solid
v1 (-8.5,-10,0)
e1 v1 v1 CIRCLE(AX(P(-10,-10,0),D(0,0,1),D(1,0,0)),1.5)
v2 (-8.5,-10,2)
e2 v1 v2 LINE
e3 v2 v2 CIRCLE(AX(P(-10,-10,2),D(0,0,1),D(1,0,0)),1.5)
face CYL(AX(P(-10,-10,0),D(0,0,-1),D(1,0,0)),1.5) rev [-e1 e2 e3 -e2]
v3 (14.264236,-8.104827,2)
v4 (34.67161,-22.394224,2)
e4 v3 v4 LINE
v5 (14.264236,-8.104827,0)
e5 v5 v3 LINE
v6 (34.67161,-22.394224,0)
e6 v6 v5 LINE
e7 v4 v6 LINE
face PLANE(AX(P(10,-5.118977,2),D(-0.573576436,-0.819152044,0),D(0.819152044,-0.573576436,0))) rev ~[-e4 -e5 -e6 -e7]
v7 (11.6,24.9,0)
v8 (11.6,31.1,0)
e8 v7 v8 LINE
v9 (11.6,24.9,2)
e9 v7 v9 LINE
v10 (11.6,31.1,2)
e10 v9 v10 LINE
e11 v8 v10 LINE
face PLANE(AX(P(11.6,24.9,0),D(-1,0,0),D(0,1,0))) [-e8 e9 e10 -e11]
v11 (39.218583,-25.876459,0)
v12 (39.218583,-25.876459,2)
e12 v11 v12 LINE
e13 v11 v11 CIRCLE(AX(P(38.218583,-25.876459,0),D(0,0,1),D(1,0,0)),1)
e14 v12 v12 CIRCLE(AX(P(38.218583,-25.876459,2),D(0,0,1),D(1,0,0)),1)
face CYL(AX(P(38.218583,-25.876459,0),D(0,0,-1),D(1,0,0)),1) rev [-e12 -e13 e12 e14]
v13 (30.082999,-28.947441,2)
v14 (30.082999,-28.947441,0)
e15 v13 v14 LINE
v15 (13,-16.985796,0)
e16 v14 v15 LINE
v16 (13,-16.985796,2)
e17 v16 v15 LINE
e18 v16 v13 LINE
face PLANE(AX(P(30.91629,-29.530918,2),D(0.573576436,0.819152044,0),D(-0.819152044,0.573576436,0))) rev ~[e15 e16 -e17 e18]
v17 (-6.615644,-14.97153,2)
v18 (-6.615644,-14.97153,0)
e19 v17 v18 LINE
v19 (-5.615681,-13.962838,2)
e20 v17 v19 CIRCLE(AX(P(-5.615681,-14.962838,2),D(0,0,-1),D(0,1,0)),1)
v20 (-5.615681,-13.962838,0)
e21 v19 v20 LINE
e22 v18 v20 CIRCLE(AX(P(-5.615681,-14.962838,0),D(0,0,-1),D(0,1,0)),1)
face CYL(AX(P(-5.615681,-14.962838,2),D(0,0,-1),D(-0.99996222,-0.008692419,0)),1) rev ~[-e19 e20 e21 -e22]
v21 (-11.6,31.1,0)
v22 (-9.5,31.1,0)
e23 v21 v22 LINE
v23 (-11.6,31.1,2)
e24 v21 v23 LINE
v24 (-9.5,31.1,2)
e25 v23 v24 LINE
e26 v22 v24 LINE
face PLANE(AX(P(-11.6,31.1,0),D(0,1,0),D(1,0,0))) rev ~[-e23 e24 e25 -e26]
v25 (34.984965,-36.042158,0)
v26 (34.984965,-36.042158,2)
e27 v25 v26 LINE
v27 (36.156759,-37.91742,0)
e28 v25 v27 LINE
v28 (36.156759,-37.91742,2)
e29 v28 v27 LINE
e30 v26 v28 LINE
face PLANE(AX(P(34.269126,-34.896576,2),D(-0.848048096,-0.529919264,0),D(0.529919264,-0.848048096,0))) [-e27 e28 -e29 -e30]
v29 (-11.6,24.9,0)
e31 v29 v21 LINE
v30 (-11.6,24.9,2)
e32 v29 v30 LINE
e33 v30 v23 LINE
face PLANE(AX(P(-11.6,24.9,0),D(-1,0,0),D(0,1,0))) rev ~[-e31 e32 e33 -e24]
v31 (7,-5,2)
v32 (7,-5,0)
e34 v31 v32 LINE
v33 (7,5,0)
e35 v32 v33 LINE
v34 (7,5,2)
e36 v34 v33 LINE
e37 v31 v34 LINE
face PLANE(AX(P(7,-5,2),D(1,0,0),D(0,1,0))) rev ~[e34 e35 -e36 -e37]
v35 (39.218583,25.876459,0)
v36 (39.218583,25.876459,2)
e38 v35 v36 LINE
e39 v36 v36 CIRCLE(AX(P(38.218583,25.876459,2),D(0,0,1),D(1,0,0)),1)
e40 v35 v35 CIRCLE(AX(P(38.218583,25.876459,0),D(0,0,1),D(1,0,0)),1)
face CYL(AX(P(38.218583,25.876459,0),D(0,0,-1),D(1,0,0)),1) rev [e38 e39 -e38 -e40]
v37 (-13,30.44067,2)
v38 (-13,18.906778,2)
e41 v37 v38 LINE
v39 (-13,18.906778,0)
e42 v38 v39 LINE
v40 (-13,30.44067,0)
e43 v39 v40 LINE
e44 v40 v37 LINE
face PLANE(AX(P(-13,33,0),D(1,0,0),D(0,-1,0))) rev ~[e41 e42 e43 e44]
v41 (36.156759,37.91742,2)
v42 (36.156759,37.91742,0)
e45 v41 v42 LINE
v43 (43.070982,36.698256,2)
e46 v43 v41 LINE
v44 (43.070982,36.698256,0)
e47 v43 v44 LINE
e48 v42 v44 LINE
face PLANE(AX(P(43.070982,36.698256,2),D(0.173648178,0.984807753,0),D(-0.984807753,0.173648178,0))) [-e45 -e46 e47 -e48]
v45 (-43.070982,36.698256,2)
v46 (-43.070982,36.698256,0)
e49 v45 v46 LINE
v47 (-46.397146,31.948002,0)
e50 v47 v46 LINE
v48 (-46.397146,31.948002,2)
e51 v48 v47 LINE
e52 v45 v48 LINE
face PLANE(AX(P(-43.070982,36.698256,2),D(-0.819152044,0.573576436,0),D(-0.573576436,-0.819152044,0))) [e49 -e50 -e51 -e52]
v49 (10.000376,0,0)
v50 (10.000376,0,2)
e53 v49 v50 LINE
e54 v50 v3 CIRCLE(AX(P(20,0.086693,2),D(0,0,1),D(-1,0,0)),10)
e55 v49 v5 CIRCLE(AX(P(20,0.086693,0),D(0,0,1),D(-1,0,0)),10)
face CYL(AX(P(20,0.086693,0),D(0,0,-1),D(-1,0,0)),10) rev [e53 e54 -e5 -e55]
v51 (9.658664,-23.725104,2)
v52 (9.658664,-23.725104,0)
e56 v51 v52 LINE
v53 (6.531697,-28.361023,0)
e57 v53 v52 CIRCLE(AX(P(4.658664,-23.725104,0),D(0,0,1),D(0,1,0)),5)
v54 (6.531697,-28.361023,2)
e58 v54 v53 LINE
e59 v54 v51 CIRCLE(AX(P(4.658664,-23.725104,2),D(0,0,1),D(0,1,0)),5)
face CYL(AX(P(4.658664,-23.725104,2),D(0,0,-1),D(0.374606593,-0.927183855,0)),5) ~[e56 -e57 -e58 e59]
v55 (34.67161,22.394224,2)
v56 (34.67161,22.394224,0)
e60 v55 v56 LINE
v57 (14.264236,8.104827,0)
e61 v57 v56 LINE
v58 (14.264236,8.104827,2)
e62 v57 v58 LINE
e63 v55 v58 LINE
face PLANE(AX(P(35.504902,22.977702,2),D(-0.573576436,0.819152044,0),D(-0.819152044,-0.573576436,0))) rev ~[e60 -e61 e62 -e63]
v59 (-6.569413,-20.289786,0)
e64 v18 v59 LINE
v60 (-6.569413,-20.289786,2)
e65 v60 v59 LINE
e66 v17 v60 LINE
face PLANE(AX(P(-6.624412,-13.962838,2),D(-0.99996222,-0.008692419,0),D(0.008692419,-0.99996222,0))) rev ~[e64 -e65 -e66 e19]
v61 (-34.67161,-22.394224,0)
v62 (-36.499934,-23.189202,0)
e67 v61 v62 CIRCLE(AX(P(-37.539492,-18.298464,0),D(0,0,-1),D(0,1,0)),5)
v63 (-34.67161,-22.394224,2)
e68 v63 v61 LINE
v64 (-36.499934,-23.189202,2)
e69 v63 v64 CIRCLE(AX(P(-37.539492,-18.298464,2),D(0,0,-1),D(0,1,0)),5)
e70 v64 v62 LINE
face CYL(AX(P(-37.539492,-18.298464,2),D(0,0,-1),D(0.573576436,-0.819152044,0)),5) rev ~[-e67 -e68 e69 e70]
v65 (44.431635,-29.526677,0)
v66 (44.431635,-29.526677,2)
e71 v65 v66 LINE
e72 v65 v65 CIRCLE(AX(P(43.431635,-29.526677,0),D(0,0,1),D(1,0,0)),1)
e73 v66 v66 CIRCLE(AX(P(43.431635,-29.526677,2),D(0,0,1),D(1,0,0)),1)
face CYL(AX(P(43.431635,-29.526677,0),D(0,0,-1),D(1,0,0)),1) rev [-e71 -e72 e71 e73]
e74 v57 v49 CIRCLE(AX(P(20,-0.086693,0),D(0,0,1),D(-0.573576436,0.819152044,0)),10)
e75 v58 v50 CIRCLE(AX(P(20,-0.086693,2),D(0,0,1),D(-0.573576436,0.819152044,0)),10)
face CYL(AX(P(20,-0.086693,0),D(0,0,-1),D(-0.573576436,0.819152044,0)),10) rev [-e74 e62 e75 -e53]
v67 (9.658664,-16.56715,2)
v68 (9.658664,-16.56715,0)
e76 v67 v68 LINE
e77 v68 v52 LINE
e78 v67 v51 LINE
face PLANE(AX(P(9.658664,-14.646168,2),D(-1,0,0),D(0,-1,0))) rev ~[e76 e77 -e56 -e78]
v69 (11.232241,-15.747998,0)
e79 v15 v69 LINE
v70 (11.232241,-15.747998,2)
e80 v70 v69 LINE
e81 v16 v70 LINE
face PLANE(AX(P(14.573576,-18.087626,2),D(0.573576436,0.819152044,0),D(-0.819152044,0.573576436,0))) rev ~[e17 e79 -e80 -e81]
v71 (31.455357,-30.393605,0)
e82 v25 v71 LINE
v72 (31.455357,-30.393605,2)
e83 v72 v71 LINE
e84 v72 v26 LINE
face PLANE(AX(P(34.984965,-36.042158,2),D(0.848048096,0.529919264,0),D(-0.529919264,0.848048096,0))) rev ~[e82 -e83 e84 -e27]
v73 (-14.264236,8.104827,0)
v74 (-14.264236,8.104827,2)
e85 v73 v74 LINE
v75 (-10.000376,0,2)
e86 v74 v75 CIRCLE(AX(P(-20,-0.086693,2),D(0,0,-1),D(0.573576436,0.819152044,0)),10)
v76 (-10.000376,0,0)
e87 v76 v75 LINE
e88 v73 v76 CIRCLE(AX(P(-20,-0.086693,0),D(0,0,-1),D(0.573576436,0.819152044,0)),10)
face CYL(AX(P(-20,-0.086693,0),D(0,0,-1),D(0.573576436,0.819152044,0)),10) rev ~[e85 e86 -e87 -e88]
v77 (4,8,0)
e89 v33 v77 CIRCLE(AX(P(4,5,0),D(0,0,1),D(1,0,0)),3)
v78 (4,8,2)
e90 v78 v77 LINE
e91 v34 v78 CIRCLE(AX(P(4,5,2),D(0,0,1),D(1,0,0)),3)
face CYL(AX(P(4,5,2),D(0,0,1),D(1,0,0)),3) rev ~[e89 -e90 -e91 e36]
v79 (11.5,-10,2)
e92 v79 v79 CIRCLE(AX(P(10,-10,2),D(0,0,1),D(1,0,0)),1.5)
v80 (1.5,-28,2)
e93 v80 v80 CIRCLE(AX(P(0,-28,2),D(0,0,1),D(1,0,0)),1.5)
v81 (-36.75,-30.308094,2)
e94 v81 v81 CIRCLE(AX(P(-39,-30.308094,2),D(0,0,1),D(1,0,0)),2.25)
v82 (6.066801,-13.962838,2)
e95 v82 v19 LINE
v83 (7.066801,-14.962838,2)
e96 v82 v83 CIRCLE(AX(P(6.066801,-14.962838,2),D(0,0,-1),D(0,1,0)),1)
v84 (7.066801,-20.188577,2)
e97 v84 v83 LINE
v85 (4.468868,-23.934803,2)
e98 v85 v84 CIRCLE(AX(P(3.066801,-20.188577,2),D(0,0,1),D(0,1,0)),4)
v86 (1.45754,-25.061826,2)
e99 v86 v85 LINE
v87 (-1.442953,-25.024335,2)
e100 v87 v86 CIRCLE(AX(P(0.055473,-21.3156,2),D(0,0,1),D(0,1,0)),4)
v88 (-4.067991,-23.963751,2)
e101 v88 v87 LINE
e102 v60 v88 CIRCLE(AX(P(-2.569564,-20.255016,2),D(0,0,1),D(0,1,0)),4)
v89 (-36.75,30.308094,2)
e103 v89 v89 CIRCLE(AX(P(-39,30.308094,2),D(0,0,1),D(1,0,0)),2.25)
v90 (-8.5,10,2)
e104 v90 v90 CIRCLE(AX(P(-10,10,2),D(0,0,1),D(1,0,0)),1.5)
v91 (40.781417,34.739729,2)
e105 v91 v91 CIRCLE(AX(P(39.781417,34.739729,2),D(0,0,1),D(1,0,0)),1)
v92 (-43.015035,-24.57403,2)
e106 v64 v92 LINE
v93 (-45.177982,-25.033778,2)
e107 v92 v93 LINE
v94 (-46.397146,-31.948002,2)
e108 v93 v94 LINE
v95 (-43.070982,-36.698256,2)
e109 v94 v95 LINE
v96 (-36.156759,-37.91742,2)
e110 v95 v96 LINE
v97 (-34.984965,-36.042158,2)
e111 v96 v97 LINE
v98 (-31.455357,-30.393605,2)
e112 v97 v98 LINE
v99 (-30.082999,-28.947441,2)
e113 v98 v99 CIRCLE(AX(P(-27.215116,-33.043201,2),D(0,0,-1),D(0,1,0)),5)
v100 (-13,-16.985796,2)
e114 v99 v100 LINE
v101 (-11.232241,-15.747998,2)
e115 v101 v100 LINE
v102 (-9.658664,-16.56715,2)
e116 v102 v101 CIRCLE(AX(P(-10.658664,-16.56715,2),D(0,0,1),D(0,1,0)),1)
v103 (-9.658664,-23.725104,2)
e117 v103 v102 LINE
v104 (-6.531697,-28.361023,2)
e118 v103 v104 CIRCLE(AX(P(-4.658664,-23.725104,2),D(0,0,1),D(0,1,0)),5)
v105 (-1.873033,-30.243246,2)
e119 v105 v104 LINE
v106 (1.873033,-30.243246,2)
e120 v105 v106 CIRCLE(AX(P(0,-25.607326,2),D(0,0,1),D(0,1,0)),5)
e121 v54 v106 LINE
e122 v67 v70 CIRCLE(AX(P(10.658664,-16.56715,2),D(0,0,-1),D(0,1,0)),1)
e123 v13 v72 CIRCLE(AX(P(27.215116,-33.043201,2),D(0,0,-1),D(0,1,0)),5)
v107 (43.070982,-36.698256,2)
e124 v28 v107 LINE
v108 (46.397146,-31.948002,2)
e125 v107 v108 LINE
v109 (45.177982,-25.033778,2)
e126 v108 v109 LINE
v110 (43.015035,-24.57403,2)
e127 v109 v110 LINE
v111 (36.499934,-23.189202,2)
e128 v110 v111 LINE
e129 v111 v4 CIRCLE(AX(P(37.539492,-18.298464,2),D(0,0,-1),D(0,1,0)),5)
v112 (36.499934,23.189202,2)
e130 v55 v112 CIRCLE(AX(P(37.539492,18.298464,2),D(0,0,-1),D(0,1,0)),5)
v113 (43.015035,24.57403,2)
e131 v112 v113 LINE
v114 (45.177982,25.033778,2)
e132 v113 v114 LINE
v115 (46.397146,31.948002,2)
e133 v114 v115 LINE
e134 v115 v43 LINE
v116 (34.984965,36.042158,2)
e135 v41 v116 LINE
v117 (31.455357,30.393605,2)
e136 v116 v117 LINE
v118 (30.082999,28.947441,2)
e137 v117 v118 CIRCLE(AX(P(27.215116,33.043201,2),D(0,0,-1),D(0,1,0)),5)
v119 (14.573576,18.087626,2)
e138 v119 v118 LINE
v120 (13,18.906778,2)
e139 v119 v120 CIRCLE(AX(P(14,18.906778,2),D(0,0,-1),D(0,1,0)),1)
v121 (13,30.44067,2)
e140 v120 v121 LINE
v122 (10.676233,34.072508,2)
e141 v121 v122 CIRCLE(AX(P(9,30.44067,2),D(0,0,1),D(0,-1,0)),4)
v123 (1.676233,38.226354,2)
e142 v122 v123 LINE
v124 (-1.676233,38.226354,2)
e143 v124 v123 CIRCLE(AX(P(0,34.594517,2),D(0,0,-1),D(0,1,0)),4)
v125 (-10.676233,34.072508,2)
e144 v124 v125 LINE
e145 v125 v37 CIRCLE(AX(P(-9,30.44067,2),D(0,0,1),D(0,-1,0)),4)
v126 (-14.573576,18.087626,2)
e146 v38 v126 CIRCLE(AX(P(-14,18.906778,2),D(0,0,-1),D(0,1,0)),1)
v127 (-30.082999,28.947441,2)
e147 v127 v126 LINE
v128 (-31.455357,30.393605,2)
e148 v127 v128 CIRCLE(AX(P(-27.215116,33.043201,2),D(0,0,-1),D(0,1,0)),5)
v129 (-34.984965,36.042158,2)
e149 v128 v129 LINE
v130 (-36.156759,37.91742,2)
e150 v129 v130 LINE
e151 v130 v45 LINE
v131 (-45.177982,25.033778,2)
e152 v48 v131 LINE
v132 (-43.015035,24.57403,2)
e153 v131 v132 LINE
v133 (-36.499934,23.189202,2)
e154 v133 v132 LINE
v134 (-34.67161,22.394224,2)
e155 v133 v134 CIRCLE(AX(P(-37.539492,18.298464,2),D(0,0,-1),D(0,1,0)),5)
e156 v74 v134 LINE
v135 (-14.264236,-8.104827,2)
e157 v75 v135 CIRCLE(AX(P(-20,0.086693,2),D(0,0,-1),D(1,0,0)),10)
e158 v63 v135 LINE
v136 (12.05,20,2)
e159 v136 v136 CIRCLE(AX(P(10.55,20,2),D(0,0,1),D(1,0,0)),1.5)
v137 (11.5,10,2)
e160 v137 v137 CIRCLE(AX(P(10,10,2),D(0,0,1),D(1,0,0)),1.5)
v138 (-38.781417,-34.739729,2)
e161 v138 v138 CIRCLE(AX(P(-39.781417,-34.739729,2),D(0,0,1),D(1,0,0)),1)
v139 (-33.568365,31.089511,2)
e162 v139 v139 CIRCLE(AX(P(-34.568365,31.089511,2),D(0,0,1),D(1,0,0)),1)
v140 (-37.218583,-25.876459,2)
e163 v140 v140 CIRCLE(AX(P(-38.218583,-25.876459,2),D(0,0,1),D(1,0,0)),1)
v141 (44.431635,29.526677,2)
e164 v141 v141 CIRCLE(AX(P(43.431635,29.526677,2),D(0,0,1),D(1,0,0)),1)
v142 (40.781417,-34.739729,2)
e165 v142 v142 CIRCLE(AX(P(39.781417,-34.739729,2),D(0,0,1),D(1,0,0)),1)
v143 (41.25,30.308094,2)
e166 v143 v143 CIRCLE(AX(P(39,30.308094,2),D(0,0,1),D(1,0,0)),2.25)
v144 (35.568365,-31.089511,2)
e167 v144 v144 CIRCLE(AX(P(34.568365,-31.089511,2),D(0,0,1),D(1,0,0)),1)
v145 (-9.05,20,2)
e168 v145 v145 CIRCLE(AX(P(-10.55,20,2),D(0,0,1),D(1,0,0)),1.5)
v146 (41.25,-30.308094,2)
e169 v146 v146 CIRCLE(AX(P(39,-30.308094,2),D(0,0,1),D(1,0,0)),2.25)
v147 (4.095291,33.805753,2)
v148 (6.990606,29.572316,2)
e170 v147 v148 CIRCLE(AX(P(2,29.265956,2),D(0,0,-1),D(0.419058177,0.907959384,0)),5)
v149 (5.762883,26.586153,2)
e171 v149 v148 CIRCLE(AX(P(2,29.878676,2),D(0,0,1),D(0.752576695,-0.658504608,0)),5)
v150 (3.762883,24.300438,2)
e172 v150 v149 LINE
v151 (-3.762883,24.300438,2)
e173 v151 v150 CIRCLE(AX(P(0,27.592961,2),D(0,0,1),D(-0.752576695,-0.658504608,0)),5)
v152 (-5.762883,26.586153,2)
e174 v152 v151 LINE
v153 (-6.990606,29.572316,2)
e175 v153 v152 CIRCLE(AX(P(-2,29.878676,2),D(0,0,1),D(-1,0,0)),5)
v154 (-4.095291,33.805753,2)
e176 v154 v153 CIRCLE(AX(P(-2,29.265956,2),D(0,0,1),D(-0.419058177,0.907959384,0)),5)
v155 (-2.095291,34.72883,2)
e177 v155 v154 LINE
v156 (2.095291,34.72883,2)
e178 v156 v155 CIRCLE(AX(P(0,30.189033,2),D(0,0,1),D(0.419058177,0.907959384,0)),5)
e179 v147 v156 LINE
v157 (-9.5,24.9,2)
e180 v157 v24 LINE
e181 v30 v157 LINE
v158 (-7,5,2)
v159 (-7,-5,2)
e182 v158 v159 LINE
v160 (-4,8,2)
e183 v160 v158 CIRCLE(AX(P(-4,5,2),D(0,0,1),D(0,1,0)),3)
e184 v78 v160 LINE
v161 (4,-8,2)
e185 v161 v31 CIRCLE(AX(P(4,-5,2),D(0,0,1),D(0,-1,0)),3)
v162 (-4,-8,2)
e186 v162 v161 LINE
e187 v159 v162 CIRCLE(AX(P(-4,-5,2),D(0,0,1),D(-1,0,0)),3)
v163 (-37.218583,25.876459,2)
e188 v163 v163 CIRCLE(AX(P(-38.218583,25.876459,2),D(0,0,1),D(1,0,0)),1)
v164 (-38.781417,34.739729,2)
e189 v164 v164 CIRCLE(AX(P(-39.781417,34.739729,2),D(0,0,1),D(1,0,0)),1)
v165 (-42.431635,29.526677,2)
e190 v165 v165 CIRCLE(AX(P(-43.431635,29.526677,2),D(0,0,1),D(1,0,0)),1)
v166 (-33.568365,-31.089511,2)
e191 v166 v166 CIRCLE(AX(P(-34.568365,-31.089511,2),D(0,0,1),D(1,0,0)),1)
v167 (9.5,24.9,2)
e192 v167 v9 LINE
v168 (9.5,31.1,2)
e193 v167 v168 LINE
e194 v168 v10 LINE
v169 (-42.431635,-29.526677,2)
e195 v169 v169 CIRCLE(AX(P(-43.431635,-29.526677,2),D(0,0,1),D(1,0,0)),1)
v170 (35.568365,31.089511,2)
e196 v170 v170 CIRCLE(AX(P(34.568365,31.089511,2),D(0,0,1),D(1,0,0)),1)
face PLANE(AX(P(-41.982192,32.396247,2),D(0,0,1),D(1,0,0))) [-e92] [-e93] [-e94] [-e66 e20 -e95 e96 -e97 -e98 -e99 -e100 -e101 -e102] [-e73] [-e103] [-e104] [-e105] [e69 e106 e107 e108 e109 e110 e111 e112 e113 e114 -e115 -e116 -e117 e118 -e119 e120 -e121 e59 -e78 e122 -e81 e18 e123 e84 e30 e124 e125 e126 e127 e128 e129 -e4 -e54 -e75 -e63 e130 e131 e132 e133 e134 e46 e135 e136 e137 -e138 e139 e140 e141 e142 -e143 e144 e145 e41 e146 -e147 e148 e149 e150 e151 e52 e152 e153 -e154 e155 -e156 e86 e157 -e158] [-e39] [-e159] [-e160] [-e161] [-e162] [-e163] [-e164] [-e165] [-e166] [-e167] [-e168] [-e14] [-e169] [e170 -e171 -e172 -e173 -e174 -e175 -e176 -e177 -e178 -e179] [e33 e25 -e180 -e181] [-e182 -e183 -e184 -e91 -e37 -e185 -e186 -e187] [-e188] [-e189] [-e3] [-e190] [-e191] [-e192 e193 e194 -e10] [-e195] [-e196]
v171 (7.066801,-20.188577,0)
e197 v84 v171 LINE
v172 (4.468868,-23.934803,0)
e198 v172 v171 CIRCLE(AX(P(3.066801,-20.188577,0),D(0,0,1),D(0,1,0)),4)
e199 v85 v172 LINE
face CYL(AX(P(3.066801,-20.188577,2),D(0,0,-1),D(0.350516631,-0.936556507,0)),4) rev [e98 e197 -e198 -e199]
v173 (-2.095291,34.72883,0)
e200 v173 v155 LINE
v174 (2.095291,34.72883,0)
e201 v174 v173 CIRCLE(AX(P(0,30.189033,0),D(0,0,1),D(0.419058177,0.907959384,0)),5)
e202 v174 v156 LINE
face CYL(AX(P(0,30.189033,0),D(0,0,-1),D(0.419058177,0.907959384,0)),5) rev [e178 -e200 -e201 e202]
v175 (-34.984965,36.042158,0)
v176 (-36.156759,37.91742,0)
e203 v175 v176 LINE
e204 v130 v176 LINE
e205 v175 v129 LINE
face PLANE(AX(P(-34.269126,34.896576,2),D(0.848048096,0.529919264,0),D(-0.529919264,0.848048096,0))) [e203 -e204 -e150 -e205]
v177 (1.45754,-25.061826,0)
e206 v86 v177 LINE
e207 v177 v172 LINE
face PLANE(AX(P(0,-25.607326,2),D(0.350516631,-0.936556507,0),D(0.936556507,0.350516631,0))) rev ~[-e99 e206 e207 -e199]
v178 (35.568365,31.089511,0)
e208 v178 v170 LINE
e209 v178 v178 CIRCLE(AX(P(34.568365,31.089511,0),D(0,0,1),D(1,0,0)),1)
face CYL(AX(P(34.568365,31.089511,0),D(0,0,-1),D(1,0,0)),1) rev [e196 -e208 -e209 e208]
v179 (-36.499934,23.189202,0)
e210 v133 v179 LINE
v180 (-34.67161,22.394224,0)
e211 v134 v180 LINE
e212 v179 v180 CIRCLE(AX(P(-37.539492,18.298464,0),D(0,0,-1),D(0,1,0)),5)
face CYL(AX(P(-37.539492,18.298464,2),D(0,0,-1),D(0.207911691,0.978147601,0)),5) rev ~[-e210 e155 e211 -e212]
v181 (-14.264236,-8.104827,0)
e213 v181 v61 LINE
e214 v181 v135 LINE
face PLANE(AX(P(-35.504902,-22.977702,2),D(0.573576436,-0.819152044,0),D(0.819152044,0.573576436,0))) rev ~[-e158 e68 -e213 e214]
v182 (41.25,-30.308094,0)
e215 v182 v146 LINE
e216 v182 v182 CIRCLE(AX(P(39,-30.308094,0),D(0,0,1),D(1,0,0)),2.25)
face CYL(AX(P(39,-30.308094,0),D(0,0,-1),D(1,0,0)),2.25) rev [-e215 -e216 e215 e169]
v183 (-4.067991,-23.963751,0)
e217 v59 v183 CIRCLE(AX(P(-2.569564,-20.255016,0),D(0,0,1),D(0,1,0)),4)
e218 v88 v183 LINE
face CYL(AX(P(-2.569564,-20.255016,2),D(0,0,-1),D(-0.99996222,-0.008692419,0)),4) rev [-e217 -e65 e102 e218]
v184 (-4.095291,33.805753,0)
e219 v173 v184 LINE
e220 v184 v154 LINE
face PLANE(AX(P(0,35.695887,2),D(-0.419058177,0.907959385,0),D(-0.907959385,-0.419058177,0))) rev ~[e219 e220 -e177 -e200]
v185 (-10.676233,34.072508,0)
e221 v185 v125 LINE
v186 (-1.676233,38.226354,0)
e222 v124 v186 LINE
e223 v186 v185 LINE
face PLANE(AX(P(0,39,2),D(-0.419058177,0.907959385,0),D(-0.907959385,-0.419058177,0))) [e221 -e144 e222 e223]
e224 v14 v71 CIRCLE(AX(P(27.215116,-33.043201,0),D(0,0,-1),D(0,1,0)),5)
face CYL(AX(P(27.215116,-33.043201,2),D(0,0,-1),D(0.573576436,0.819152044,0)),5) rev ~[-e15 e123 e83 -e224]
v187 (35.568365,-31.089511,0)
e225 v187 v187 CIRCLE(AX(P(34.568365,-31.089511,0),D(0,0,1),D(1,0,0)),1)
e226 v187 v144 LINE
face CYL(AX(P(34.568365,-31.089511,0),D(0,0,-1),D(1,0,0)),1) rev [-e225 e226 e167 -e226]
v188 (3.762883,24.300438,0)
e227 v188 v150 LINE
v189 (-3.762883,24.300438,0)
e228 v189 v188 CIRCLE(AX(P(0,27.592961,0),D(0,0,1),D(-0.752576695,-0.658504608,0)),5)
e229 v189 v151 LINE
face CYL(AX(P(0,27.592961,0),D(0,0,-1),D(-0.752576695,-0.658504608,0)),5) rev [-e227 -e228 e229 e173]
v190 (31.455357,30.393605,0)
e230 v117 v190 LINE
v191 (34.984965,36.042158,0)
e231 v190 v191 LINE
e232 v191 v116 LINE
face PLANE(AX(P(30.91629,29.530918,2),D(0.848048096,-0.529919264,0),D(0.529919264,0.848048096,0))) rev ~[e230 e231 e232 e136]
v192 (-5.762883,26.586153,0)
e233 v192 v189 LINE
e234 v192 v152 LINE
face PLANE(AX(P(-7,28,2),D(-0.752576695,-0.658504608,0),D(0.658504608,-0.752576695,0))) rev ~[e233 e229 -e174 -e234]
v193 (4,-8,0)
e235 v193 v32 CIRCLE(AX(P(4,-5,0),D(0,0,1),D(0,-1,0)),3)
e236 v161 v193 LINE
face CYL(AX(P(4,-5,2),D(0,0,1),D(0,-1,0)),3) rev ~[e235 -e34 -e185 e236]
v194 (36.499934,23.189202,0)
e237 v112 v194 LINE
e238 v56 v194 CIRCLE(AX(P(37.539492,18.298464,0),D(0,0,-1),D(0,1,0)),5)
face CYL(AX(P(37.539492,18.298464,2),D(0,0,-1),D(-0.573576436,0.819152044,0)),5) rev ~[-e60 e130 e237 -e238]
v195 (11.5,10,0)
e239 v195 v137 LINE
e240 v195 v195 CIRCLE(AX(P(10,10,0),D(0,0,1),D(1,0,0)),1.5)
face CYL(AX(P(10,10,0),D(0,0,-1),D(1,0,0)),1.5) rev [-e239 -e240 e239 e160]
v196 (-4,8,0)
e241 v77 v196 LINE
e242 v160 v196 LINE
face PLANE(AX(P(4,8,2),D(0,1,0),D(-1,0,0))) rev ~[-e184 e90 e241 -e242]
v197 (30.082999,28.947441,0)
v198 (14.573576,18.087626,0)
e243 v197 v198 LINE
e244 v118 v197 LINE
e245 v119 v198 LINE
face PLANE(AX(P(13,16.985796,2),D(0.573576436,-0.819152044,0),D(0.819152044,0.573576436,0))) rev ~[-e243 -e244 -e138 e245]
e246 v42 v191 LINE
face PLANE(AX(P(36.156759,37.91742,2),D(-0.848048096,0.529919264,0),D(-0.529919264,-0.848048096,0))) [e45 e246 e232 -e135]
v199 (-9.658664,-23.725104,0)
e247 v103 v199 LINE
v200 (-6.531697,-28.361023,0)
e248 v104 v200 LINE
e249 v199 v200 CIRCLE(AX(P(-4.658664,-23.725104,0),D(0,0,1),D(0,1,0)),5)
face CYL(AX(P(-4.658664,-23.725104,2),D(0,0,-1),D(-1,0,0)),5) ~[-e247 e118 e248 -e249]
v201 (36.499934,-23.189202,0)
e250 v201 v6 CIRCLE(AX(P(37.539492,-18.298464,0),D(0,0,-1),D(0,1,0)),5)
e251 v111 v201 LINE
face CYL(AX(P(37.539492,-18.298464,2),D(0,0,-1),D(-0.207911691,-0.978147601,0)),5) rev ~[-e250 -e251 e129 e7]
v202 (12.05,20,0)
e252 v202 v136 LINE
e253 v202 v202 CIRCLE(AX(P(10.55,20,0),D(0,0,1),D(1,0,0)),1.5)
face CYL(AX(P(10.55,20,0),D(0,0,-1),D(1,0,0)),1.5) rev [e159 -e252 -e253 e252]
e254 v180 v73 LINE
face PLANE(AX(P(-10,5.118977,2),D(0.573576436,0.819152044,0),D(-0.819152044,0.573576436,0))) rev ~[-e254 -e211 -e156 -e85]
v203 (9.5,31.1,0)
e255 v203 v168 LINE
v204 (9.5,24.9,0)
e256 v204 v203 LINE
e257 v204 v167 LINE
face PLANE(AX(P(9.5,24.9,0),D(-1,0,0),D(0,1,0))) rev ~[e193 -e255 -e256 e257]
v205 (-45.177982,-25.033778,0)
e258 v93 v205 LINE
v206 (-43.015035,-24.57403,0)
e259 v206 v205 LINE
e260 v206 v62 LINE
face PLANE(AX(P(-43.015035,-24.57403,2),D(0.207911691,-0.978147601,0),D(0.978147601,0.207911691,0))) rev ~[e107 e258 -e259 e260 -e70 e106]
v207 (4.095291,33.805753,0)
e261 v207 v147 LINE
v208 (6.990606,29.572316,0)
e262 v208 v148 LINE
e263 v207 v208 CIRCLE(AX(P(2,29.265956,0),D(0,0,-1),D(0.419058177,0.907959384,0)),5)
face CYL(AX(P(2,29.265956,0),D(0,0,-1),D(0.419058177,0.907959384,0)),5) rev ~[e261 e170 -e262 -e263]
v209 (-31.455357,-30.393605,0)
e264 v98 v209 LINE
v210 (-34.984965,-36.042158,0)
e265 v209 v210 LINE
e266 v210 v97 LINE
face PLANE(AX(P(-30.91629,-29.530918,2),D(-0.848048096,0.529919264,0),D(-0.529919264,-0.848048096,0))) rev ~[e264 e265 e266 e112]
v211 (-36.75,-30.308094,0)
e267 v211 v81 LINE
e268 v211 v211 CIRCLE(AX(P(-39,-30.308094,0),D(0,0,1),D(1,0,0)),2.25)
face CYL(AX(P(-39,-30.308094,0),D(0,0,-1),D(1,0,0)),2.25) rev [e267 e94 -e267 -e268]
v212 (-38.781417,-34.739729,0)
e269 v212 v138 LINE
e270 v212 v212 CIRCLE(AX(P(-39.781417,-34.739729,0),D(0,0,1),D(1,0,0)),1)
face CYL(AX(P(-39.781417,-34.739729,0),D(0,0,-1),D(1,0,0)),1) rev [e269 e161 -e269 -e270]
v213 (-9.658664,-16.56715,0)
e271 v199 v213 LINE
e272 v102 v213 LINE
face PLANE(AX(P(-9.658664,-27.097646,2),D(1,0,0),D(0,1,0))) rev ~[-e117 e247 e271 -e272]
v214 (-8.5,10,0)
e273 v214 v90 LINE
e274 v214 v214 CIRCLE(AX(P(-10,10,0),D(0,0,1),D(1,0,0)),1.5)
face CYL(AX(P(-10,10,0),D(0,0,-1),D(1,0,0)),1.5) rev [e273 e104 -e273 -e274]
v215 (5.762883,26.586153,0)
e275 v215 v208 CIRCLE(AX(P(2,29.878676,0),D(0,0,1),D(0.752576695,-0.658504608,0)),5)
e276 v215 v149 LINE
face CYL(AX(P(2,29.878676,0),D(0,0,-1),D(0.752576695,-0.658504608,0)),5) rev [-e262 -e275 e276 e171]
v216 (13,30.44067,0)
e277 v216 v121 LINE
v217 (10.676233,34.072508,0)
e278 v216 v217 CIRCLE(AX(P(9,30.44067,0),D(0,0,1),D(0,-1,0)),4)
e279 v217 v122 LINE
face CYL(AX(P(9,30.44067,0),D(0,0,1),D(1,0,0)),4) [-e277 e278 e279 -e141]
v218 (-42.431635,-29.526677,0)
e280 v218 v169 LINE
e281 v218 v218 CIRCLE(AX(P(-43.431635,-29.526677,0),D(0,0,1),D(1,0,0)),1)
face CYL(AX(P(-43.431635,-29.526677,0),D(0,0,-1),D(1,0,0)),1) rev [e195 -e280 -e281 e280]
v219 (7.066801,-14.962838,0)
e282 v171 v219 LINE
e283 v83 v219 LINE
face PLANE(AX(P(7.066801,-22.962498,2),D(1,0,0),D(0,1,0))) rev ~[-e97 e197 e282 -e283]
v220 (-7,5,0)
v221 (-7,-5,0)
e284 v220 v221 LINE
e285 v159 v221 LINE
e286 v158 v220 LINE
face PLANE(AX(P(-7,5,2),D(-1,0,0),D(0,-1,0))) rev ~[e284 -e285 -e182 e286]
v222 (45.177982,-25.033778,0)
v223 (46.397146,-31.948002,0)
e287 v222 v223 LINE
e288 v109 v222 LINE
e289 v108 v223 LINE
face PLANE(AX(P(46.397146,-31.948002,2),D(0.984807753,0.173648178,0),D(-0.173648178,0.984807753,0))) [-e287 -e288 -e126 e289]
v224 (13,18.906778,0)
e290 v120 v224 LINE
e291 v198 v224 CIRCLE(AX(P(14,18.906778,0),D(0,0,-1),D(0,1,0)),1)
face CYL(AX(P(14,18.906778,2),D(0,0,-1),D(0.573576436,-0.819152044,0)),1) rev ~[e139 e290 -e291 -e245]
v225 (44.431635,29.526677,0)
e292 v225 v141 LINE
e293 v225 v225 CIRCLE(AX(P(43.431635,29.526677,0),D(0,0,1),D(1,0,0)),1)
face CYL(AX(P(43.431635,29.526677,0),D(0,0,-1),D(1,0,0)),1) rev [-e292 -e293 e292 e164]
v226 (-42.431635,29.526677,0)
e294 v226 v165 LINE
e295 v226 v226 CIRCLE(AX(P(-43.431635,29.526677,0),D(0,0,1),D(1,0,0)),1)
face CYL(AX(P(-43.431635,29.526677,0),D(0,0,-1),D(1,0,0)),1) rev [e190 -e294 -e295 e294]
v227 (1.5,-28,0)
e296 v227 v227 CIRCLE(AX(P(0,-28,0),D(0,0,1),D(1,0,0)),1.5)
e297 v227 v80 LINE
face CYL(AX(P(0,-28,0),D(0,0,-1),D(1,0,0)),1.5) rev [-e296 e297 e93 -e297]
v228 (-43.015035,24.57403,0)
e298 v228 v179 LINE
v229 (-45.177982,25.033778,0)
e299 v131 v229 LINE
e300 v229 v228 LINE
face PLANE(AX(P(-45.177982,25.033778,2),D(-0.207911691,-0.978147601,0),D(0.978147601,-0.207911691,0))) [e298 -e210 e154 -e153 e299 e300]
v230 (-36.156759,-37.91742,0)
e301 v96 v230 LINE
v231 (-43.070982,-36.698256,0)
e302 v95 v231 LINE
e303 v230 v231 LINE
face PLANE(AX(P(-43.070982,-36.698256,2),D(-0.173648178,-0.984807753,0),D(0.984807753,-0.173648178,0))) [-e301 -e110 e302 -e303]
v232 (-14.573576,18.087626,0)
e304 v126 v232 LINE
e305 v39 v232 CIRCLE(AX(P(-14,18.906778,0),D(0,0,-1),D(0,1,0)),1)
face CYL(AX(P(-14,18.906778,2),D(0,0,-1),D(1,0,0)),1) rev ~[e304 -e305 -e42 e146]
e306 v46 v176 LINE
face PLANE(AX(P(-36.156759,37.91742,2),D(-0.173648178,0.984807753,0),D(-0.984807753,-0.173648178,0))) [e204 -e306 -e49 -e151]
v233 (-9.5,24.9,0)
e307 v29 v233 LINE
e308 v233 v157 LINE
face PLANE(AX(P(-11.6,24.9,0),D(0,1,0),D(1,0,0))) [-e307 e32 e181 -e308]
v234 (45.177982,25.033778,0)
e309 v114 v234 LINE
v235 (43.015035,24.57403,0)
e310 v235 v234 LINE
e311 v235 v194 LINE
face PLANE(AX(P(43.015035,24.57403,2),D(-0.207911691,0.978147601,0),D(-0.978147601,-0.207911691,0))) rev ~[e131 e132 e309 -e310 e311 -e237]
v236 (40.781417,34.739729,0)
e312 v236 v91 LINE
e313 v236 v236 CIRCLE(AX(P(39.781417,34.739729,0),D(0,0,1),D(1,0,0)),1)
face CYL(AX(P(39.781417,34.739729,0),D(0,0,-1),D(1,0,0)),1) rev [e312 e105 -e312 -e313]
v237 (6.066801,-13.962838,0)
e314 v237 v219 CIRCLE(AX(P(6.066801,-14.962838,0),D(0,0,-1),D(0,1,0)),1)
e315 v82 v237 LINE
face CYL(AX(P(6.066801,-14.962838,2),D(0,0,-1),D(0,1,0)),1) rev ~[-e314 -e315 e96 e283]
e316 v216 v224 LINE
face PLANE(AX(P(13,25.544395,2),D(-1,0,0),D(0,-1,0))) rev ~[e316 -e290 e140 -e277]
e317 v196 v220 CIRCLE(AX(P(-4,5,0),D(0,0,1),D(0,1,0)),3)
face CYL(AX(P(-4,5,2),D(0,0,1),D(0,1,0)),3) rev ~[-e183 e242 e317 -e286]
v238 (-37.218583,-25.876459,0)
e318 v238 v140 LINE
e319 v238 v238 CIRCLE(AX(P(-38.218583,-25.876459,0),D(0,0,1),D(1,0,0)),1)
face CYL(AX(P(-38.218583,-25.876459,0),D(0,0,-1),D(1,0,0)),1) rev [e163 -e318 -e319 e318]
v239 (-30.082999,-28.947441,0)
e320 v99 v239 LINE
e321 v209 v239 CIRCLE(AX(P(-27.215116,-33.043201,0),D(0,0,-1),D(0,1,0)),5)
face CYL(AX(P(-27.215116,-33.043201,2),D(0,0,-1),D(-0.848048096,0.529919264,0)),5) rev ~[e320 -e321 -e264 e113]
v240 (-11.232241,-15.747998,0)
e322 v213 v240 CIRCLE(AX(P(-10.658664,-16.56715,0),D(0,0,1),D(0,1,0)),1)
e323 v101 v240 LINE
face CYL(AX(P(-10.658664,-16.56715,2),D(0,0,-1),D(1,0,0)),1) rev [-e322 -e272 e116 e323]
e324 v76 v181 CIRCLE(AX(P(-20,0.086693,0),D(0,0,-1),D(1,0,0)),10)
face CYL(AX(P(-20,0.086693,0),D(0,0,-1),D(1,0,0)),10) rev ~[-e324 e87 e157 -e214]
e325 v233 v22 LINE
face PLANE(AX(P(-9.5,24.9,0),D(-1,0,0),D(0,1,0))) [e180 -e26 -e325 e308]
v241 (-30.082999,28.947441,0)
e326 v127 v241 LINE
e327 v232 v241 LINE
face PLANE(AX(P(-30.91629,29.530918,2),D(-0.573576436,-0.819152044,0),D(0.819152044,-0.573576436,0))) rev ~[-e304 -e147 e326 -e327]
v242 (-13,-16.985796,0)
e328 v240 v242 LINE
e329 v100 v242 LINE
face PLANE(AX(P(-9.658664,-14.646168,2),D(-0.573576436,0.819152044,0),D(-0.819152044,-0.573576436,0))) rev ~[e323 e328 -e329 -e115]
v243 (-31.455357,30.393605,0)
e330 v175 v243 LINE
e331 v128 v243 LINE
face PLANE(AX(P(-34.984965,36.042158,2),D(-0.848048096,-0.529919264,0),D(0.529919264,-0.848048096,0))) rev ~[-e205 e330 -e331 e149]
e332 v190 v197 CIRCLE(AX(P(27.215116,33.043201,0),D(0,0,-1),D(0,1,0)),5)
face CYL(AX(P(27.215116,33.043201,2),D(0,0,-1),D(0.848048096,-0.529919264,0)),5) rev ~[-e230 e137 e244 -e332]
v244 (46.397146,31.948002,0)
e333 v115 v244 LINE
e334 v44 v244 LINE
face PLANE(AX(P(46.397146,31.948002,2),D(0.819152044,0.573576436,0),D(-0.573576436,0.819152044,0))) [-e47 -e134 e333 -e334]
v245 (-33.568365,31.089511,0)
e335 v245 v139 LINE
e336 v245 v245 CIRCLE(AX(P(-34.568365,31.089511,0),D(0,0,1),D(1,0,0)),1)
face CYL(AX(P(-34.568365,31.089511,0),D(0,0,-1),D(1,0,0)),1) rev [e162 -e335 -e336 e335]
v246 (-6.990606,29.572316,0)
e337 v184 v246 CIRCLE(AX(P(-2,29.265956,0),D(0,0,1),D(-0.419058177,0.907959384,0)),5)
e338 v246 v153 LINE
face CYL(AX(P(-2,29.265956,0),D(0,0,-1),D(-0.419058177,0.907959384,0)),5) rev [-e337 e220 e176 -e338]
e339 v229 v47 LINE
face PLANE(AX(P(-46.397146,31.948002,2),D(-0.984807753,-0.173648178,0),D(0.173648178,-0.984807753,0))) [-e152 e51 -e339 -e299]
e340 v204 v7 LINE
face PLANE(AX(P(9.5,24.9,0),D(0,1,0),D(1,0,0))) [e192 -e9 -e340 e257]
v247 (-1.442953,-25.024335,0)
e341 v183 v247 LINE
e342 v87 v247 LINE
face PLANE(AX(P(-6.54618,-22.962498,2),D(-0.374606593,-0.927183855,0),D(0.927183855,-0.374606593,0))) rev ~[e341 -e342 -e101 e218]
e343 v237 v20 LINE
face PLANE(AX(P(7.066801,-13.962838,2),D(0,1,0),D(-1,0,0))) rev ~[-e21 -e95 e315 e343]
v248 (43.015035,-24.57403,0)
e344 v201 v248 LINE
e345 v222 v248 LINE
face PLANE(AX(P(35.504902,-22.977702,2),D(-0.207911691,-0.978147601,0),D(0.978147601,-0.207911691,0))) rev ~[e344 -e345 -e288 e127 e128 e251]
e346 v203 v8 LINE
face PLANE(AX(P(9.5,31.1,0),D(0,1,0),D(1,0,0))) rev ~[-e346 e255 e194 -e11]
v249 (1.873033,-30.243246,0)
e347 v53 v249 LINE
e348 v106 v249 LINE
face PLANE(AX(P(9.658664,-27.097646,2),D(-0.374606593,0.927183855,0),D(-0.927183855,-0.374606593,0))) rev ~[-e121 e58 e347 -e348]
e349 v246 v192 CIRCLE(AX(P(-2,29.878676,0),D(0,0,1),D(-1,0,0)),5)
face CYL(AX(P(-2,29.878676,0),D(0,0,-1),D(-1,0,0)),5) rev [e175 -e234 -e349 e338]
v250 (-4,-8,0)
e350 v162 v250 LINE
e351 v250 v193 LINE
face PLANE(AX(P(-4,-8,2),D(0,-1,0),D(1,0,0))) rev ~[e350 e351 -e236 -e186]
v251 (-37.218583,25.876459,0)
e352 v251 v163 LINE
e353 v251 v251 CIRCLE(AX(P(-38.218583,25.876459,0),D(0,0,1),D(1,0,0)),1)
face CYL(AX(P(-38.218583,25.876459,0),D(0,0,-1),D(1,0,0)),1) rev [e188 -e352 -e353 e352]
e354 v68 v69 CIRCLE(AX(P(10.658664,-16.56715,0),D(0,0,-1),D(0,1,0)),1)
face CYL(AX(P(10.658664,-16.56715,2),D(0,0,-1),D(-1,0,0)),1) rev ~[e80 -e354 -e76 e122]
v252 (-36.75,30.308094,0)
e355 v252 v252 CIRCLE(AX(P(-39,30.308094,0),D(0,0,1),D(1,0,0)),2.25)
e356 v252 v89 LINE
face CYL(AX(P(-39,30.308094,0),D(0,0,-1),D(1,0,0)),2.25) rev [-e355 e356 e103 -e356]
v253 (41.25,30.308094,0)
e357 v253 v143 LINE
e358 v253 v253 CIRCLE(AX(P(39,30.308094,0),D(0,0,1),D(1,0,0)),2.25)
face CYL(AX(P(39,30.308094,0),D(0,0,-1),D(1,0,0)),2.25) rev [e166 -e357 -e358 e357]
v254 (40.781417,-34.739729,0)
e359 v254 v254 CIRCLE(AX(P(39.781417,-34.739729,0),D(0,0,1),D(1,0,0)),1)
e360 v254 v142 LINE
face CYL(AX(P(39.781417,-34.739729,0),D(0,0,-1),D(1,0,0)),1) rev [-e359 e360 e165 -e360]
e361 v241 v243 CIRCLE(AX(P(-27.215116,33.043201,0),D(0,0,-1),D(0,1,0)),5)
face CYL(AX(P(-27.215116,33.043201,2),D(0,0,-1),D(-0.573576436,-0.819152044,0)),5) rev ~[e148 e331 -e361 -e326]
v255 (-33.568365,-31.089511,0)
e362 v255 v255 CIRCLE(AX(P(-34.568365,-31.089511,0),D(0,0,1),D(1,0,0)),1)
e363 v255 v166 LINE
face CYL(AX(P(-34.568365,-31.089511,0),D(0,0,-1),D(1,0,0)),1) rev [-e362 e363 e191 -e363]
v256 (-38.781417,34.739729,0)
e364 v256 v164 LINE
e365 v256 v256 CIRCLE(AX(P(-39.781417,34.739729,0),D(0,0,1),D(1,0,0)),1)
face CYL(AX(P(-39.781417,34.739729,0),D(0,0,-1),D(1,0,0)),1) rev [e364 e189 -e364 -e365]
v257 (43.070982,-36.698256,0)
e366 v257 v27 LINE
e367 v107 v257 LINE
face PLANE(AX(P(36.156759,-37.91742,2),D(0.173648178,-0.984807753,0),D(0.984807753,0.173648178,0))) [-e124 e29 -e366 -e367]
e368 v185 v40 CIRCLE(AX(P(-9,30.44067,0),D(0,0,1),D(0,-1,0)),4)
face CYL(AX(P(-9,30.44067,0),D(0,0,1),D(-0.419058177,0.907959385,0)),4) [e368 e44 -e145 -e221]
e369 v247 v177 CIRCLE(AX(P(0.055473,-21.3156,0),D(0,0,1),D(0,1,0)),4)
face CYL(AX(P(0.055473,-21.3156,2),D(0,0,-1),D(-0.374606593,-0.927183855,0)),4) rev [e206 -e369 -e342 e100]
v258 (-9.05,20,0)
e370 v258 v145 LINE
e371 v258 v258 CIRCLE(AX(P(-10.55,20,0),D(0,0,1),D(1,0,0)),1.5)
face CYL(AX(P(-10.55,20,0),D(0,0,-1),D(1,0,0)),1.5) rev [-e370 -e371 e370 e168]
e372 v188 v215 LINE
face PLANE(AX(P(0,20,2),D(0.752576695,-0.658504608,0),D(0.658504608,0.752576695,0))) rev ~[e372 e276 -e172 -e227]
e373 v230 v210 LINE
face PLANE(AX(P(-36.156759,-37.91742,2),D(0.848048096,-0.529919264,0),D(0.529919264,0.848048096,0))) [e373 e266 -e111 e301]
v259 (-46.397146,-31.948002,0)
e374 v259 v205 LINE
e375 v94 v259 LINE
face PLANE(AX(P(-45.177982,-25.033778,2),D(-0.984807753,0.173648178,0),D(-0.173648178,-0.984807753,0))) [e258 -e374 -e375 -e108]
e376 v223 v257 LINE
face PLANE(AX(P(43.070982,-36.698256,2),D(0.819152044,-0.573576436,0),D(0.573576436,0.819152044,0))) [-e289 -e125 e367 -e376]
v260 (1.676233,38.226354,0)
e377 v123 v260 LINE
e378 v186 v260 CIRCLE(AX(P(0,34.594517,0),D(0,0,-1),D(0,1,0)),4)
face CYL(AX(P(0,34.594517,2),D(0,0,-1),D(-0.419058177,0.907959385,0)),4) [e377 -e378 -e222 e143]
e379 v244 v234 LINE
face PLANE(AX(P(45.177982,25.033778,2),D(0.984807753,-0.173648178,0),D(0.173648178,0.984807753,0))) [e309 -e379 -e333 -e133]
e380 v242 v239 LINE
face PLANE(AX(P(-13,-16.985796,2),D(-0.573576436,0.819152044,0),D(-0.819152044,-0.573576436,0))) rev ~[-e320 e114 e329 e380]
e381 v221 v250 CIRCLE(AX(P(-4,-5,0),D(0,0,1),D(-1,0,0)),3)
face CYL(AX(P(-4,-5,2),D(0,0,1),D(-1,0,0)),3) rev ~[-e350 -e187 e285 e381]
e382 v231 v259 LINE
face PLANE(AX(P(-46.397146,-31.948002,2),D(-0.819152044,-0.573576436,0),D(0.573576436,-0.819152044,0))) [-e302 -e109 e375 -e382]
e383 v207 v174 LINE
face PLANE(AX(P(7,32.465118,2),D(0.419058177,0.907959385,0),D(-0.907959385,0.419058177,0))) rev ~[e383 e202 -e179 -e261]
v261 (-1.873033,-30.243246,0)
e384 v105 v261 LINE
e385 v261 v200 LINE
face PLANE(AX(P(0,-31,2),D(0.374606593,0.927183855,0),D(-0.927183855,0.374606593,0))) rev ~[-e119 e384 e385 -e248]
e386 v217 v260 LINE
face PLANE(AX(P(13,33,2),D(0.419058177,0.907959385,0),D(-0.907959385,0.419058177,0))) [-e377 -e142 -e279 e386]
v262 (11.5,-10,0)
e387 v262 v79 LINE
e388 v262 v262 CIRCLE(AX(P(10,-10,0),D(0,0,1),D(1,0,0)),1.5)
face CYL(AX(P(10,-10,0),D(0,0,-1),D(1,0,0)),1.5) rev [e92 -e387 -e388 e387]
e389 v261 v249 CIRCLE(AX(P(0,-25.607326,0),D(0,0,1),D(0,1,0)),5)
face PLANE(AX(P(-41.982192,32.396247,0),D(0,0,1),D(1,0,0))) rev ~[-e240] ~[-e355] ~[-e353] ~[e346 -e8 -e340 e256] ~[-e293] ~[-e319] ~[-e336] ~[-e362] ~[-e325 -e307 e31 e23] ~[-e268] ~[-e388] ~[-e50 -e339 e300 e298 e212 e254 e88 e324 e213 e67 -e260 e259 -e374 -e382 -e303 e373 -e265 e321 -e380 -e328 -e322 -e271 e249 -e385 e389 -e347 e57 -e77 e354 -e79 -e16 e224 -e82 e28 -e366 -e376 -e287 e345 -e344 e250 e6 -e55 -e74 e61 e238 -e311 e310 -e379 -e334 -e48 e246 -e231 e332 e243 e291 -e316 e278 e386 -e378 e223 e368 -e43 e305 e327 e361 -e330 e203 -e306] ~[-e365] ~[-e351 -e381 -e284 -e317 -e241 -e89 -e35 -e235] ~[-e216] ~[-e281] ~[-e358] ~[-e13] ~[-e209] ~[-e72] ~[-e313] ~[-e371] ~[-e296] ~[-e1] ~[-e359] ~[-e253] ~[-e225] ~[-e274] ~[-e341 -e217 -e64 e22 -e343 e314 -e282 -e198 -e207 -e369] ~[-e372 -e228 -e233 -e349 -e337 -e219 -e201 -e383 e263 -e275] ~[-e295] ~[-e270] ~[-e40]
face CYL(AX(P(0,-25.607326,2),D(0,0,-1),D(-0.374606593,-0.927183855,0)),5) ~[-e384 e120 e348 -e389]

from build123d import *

# Parameters (mm, degrees)
F0_R         = 1.5
F0_R_2       = 1
F0_R_3       = 2.25
F0_W         = 2.1
F0_H         = 6.2
F1_DEPTH     = 2
F3_DEPTH     = 2
F4_R         = 4
F6_DEPTH     = 2.001
F7_T1_DEPTH  = 2
F9_DEPTH     = 2.001
F10_R        = 5
F11_R        = 1
F12_T1_DEPTH = 2
F14_DEPTH    = 2
F16_DEPTH    = 2.001
F18_DEPTH    = 2.001
F19_R        = 5
F21_DEPTH    = 2.001
F22_R        = 4
F23_R        = 1
F24_R        = 1


# Not quite as in the source:
# - a fillet or chamfer that OpenCascade refuses, or shapes differently, is made with other operations: its cross-section is extruded or revolved along the edge and cut away or added


with BuildPart() as f1:
    # F0 (on Top) → F1 (new body)
    with BuildSketch(Plane.XY):
        Polygon((13, 3.5572758754), (13, 13), (-13, 13), (-13, 3.5572758754), (-13, -3.5572758754), (-13, -13), (13, -13), (13, -3.5572758754), align=None)
        with Locations((-10, -10)):
            Circle(F0_R, mode=Mode.SUBTRACT)
        with Locations((10, -10)):
            Circle(F0_R, mode=Mode.SUBTRACT)
        with Locations((-10, 10)):
            Circle(F0_R, mode=Mode.SUBTRACT)
        with Locations((10, 10)):
            Circle(F0_R, mode=Mode.SUBTRACT)
        with BuildLine():
            Line((13, 20.6481201181), (13, 13))
            Line((13, 13), (13, 3.5572758754))
            Line((13, 3.5572758754), (43.0150350545, 24.5740296802))
            ThreePointArc((43.0150350545, 24.5740296802), (44.73406431, 34.3231290446), (34.9849649455, 36.0421583002))
            Line((34.9849649455, 36.0421583002), (13, 20.6481201181))
        make_face()
        with Locations((38.2185832005, 25.8764591016)):
            Circle(F0_R_2, mode=Mode.SUBTRACT)
        with Locations((39, 30.3080939902)):
            Circle(F0_R_3, mode=Mode.SUBTRACT)
        with Locations((34.5683651114, 31.0895107897)):
            Circle(F0_R_2, mode=Mode.SUBTRACT)
        with Locations((43.4316348886, 29.5266771907)):
            Circle(F0_R_2, mode=Mode.SUBTRACT)
        with Locations((39.7814167995, 34.7397288787)):
            Circle(F0_R_2, mode=Mode.SUBTRACT)
        Polygon((-13, 13), (13, 13), (13, 20.6481201181), (13, 33), (-13, 33), (-13, 20.6481201181), align=None)
        with Locations((-10.55, 20)):
            Circle(F0_R, mode=Mode.SUBTRACT)
        with Locations((-10.55, 28)):
            Rectangle(F0_W, F0_H, mode=Mode.SUBTRACT)
        with Locations((10.55, 20)):
            Circle(F0_R, mode=Mode.SUBTRACT)
        with Locations((10.55, 28)):
            Rectangle(F0_W, F0_H, mode=Mode.SUBTRACT)
        with BuildLine():
            Line((-13, 3.5572758754), (-13, 13))
            Line((-13, 13), (-13, 20.6481201181))
            Line((-13, 20.6481201181), (-34.9849649455, 36.0421583002))
            ThreePointArc((-34.9849649455, 36.0421583002), (-44.73406431, 34.3231290446), (-43.0150350545, 24.5740296802))
            Line((-43.0150350545, 24.5740296802), (-13, 3.5572758754))
        make_face()
        with Locations((-38.2185832005, 25.8764591016)):
            Circle(F0_R_2, mode=Mode.SUBTRACT)
        with Locations((-43.4316348886, 29.5266771907)):
            Circle(F0_R_2, mode=Mode.SUBTRACT)
        with Locations((-39, 30.3080939902)):
            Circle(F0_R_3, mode=Mode.SUBTRACT)
        with Locations((-34.5683651114, 31.0895107897)):
            Circle(F0_R_2, mode=Mode.SUBTRACT)
        with Locations((-39.7814167995, 34.7397288787)):
            Circle(F0_R_2, mode=Mode.SUBTRACT)
        with BuildLine():
            Line((43.0150350545, -24.5740296802), (13, -3.5572758754))
            Line((13, -3.5572758754), (13, -13))
            Line((13, -13), (13, -20.6481201181))
            Line((13, -20.6481201181), (34.9849649455, -36.0421583002))
            ThreePointArc((34.9849649455, -36.0421583002), (44.73406431, -34.3231290446), (43.0150350545, -24.5740296802))
        make_face()
        with Locations((39.7814167995, -34.7397288787)):
            Circle(F0_R_2, mode=Mode.SUBTRACT)
        with Locations((34.5683651114, -31.0895107897)):
            Circle(F0_R_2, mode=Mode.SUBTRACT)
        with Locations((39, -30.3080939902)):
            Circle(F0_R_3, mode=Mode.SUBTRACT)
        with Locations((43.4316348886, -29.5266771907)):
            Circle(F0_R_2, mode=Mode.SUBTRACT)
        with Locations((38.2185832005, -25.8764591016)):
            Circle(F0_R_2, mode=Mode.SUBTRACT)
        with BuildLine():
            Line((-13, -13), (-13, -3.5572758754))
            Line((-13, -3.5572758754), (-43.0150350545, -24.5740296802))
            ThreePointArc((-43.0150350545, -24.5740296802), (-44.73406431, -34.3231290446), (-34.9849649455, -36.0421583002))
            Line((-34.9849649455, -36.0421583002), (-13, -20.6481201181))
            Line((-13, -20.6481201181), (-13, -13))
        make_face()
        with Locations((-39.7814167995, -34.7397288787)):
            Circle(F0_R_2, mode=Mode.SUBTRACT)
        with Locations((-43.4316348886, -29.5266771907)):
            Circle(F0_R_2, mode=Mode.SUBTRACT)
        with Locations((-34.5683651114, -31.0895107897)):
            Circle(F0_R_2, mode=Mode.SUBTRACT)
        with Locations((-39, -30.3080939902)):
            Circle(F0_R_3, mode=Mode.SUBTRACT)
        with Locations((-38.2185832005, -25.8764591016)):
            Circle(F0_R_2, mode=Mode.SUBTRACT)
        Polygon((13, -20.6481201181), (13, -13), (-13, -13), (-13, -20.6481201181), (-13, -31), (13, -31), align=None)
        with Locations((0, -28)):
            Circle(F0_R, mode=Mode.SUBTRACT)
    extrude(amount=F1_DEPTH)

    # F2 (on face) → F3 (join, through all)
    with BuildSketch(Plane.XY.offset(2)):
        Polygon((0, 39), (-13, 33), (-13, 32), (13, 32), (13, 33), align=None)
    extrude(amount=-F3_DEPTH)

    # F4
    f4_edges = [f1.edges().sort_by_distance(p)[0] for p in [
        (-13, 33, 1),
        (0, 39, 1),
        (13, 33, 1),
    ]]
    fillet(f4_edges, radius=F4_R)

    # F5 (on face) → F6 (cut, through all)
    with BuildSketch(Plane.XY.offset(2)):
        Polygon((7, 32.4651182162), (0, 35.6958874469), (-7, 32.4651182162), (-7, 28), (0, 20), (7, 28), align=None)
    extrude(amount=-F6_DEPTH, mode=Mode.SUBTRACT)

    # F7: fillet of radius 5 on 6 edges, made by hand

    # F7_s2 → F7_t1 (join)
    with BuildSketch(Plane.XY):
        with BuildLine():
            ThreePointArc((2.0952908873, 34.7288301143), (0, 35.1890331918), (-2.0952908873, 34.7288301143))
            Line((-2.0952908873, 34.7288301143), (0, 35.6958874469))
            Line((0, 35.6958874469), (2.0952908873, 34.7288301143))
        make_face()
        with BuildLine():
            ThreePointArc((-4.0952908873, 33.8057531913), (-6.2116774827, 31.9607239362), (-7, 29.2659562688))
            Line((-7, 29.2659562688), (-7, 32.4651182162))
            Line((-7, 32.4651182162), (-4.0952908873, 33.8057531913))
        make_face()
        with BuildLine():
            ThreePointArc((4.0952908873, 33.8057531913), (6.2116774827, 31.9607239362), (7, 29.2659562688))
            Line((7, 29.2659562688), (7, 32.4651182162))
            Line((7, 32.4651182162), (4.0952908873, 33.8057531913))
        make_face()
        with BuildLine():
            ThreePointArc((5.7628834735, 26.5861525412), (6.6805137201, 28.1200422145), (7, 29.8786755805))
            Line((7, 29.8786755805), (7, 28))
            Line((7, 28), (5.7628834735, 26.5861525412))
        make_face()
        with BuildLine():
            ThreePointArc((-7, 29.8786755805), (-6.6805137201, 28.1200422145), (-5.7628834735, 26.5861525412))
            Line((-5.7628834735, 26.5861525412), (-7, 28))
            Line((-7, 28), (-7, 29.8786755805))
        make_face()
        with BuildLine():
            ThreePointArc((-3.7628834735, 24.3004382555), (0, 22.5929612948), (3.7628834735, 24.3004382555))
            Line((3.7628834735, 24.3004382555), (0, 20))
            Line((0, 20), (-3.7628834735, 24.3004382555))
        make_face()
    extrude(amount=F7_T1_DEPTH)

    # F8 (on face) → F9 (cut, through all)
    with BuildSketch(Plane.XY.offset(2)):
        Polygon((-34.9849649455, 36.0421583002), (-30.9162904101, 29.5309179537), (-13, 16.9857963518), (-13, 25.5443952801), (-34.9849649455, 40.9384334622), align=None)
        Polygon((-10, -5.1189770271), (-10, 5.1189770271), (-35.5049019009, 22.9777015993), (-43.0150350545, 24.5740296802), (-43.0150350545, 21.0167538048), (-13, 0), (-43.0150350545, -21.0167538048), (-43.0150350545, -24.5740296802), (-35.5049019009, -22.9777015993), align=None)
        Polygon((13, 25.5443952801), (13, 16.9857963518), (30.9162904101, 29.5309179537), (34.9849649455, 36.0421583002), (34.9849649455, 40.9384334622), align=None)
        Polygon((35.5049019009, 22.9777015993), (10, 5.1189770271), (10, -5.1189770271), (35.5049019009, -22.9777015993), (43.0150350545, -24.5740296802), (43.0150350545, -21.0167538048), (13, 0), (43.0150350545, 21.0167538048), (43.0150350545, 24.5740296802), align=None)
        Polygon((13, -16.9857963518), (13, -25.824060059), (34.9849649455, -41.2180982412), (34.9849649455, -36.0421583002), (30.9162904101, -29.5309179537), align=None)
        Polygon((-13, -16.9857963518), (-30.9162904101, -29.5309179537), (-34.9849649455, -36.0421583002), (-34.9849649455, -41.2180982412), (-13, -25.824060059), align=None)
    extrude(amount=-F9_DEPTH, mode=Mode.SUBTRACT)

    # F10
    f10_edges = [f1.edges().sort_by_distance(p)[0] for p in [
        (30.91629, -29.530918, 1),
        (30.91629, 29.530918, 1),
        (-30.91629, 29.530918, 1),
        (-35.504902, 22.977702, 1),
        (35.504902, 22.977702, 1),
        (-35.504902, -22.977702, 1),
        (-30.91629, -29.530918, 1),
        (35.504902, -22.977702, 1),
    ]]
    fillet(f10_edges, radius=F10_R)

    # F11
    f11_edges = [f1.edges().sort_by_distance(p)[0] for p in [
        (-13, 16.985796, 1),
        (13, 16.985796, 1),
    ]]
    fillet(f11_edges, radius=F11_R)

    # F12: fillet of radius 10 on 4 edges, made by hand

    # F12_s2 → F12_t1 (join)
    with BuildSketch(Plane.XY):
        with BuildLine():
            ThreePointArc((-14.2642356365, 8.1048269644), (-11.1298916682, 4.5307926539), (-10, -0.0866934785))
            Line((-10, -0.0866934785), (-10, 5.1189770271))
            Line((-10, 5.1189770271), (-14.2642356365, 8.1048269644))
        make_face()
        with BuildLine():
            ThreePointArc((-10, 0.0866934785), (-11.1298916682, -4.5307926539), (-14.2642356365, -8.1048269644))
            Line((-14.2642356365, -8.1048269644), (-10, -5.1189770271))
            Line((-10, -5.1189770271), (-10, 0.0866934785))
        make_face()
        with BuildLine():
            ThreePointArc((14.2642356365, 8.1048269644), (11.1298916682, 4.5307926539), (10, -0.0866934785))
            Line((10, -0.0866934785), (10, 5.1189770271))
            Line((10, 5.1189770271), (14.2642356365, 8.1048269644))
        make_face()
        with BuildLine():
            ThreePointArc((10, 0.0866934785), (11.1298916682, -4.5307926539), (14.2642356365, -8.1048269644))
            Line((14.2642356365, -8.1048269644), (10, -5.1189770271))
            Line((10, -5.1189770271), (10, 0.0866934785))
        make_face()
    extrude(amount=F12_T1_DEPTH)

    # F13 (on face) → F14 (join, through all)
    with BuildSketch(Plane.XY.offset(2)):
        with BuildLine():
            Line((-45.1779821171, 25.0337782709), (-41.6937086247, 24.2931730774))
            ThreePointArc((-41.6937086247, 24.2931730774), (-44.3986619113, 34.0882777567), (-34.2691258135, 34.89657622))
            Line((-34.2691258135, 34.89657622), (-36.156758768, 37.9174204152))
            Line((-36.156758768, 37.9174204152), (-43.0709823371, 36.6982562494))
            Line((-43.0709823371, 36.6982562494), (-46.397146283, 31.9480018399))
            Line((-46.397146283, 31.9480018399), (-45.1779821171, 25.0337782709))
        make_face()
        with BuildLine():
            Line((36.156758768, 37.9174204152), (34.2691258135, 34.89657622))
            ThreePointArc((34.2691258135, 34.89657622), (44.3986619113, 34.0882777567), (41.6937086247, 24.2931730774))
            Line((41.6937086247, 24.2931730774), (45.1779821171, 25.0337782709))
            Line((45.1779821171, 25.0337782709), (46.397146283, 31.9480018399))
            Line((46.397146283, 31.9480018399), (43.0709823371, 36.6982562494))
            Line((43.0709823371, 36.6982562494), (36.156758768, 37.9174204152))
        make_face()
        with BuildLine():
            Line((-36.156758768, -37.9174204152), (-34.2691258135, -34.89657622))
            ThreePointArc((-34.2691258135, -34.89657622), (-44.3986619113, -34.0882777567), (-41.6937086247, -24.2931730774))
            Line((-41.6937086247, -24.2931730774), (-45.1779821171, -25.0337782709))
            Line((-45.1779821171, -25.0337782709), (-46.397146283, -31.9480018399))
            Line((-46.397146283, -31.9480018399), (-43.0709823371, -36.6982562494))
            Line((-43.0709823371, -36.6982562494), (-36.156758768, -37.9174204152))
        make_face()
        with BuildLine():
            ThreePointArc((41.6937086247, -24.2931730774), (44.3986619113, -34.0882777567), (34.2691258135, -34.89657622))
            Line((34.2691258135, -34.89657622), (36.156758768, -37.9174204152))
            Line((36.156758768, -37.9174204152), (43.0709823371, -36.6982562494))
            Line((43.0709823371, -36.6982562494), (46.397146283, -31.9480018399))
            Line((46.397146283, -31.9480018399), (45.1779821171, -25.0337782709))
            Line((45.1779821171, -25.0337782709), (41.6937086247, -24.2931730774))
        make_face()
    extrude(amount=-F14_DEPTH)

    # F15 (on face) → F16 (cut, through all)
    with BuildSketch(Plane.XY.offset(2)):
        with BuildLine():
            ThreePointArc((7, 5), (6.1213203436, 7.1213203436), (4, 8))
            Line((4, 8), (-4, 8))
            ThreePointArc((-4, 8), (-6.1213203436, 7.1213203436), (-7, 5))
            Line((-7, 5), (-7, -5))
            ThreePointArc((-7, -5), (-6.1213203436, -7.1213203436), (-4, -8))
            Line((-4, -8), (4, -8))
            ThreePointArc((4, -8), (6.1213203436, -7.1213203436), (7, -5))
            Line((7, -5), (7, 5))
        make_face()
    extrude(amount=-F16_DEPTH, mode=Mode.SUBTRACT)

    # F17 (on face) → F18 (cut, through all)
    with BuildSketch(Plane.XY.offset(2)):
        Polygon((14.5735764364, -34.0217222472), (14.5735764364, -18.0876264345), (9.6586641706, -14.6461678163), (9.6586641706, -27.0976463685), (0, -31), (-9.6586641706, -27.0976463685), (-9.6586641706, -14.6461678163), (-14.5735764364, -18.0876264345), (-14.5735764364, -34.0217222472), align=None)
    extrude(amount=-F18_DEPTH, mode=Mode.SUBTRACT)

    # F19
    f19_edges = [f1.edges().sort_by_distance(p)[0] for p in [
        (0, -31, 1),
        (-9.658664, -27.097646, 1),
        (9.658664, -27.097646, 1),
    ]]
    fillet(f19_edges, radius=F19_R)

    # F20 (on face) → F21 (cut, through all)
    with BuildSketch(Plane.XY.offset(2)):
        Polygon((7.0668010645, -13.9628378529), (-6.6244119044, -13.9628378529), (-6.5461801306, -22.9624978348), (0, -25.6073262866), (7.0668010645, -22.9624978348), align=None)
    extrude(amount=-F21_DEPTH, mode=Mode.SUBTRACT)

    # F22
    f22_edges = [f1.edges().sort_by_distance(p)[0] for p in [
        (-6.54618, -22.962498, 1),
        (0, -25.607326, 1),
        (7.066801, -22.962498, 1),
    ]]
    fillet(f22_edges, radius=F22_R)

    # F23
    f23_edges = [f1.edges().sort_by_distance(p)[0] for p in [
        (-6.624412, -13.962838, 1),
        (7.066801, -13.962838, 1),
    ]]
    fillet(f23_edges, radius=F23_R)

    # F24
    f24_edges = [f1.edges().sort_by_distance(p)[0] for p in [
        (-9.658664, -14.646168, 1),
        (9.658664, -14.646168, 1),
    ]]
    fillet(f24_edges, radius=F24_R)


solid = f1.part
